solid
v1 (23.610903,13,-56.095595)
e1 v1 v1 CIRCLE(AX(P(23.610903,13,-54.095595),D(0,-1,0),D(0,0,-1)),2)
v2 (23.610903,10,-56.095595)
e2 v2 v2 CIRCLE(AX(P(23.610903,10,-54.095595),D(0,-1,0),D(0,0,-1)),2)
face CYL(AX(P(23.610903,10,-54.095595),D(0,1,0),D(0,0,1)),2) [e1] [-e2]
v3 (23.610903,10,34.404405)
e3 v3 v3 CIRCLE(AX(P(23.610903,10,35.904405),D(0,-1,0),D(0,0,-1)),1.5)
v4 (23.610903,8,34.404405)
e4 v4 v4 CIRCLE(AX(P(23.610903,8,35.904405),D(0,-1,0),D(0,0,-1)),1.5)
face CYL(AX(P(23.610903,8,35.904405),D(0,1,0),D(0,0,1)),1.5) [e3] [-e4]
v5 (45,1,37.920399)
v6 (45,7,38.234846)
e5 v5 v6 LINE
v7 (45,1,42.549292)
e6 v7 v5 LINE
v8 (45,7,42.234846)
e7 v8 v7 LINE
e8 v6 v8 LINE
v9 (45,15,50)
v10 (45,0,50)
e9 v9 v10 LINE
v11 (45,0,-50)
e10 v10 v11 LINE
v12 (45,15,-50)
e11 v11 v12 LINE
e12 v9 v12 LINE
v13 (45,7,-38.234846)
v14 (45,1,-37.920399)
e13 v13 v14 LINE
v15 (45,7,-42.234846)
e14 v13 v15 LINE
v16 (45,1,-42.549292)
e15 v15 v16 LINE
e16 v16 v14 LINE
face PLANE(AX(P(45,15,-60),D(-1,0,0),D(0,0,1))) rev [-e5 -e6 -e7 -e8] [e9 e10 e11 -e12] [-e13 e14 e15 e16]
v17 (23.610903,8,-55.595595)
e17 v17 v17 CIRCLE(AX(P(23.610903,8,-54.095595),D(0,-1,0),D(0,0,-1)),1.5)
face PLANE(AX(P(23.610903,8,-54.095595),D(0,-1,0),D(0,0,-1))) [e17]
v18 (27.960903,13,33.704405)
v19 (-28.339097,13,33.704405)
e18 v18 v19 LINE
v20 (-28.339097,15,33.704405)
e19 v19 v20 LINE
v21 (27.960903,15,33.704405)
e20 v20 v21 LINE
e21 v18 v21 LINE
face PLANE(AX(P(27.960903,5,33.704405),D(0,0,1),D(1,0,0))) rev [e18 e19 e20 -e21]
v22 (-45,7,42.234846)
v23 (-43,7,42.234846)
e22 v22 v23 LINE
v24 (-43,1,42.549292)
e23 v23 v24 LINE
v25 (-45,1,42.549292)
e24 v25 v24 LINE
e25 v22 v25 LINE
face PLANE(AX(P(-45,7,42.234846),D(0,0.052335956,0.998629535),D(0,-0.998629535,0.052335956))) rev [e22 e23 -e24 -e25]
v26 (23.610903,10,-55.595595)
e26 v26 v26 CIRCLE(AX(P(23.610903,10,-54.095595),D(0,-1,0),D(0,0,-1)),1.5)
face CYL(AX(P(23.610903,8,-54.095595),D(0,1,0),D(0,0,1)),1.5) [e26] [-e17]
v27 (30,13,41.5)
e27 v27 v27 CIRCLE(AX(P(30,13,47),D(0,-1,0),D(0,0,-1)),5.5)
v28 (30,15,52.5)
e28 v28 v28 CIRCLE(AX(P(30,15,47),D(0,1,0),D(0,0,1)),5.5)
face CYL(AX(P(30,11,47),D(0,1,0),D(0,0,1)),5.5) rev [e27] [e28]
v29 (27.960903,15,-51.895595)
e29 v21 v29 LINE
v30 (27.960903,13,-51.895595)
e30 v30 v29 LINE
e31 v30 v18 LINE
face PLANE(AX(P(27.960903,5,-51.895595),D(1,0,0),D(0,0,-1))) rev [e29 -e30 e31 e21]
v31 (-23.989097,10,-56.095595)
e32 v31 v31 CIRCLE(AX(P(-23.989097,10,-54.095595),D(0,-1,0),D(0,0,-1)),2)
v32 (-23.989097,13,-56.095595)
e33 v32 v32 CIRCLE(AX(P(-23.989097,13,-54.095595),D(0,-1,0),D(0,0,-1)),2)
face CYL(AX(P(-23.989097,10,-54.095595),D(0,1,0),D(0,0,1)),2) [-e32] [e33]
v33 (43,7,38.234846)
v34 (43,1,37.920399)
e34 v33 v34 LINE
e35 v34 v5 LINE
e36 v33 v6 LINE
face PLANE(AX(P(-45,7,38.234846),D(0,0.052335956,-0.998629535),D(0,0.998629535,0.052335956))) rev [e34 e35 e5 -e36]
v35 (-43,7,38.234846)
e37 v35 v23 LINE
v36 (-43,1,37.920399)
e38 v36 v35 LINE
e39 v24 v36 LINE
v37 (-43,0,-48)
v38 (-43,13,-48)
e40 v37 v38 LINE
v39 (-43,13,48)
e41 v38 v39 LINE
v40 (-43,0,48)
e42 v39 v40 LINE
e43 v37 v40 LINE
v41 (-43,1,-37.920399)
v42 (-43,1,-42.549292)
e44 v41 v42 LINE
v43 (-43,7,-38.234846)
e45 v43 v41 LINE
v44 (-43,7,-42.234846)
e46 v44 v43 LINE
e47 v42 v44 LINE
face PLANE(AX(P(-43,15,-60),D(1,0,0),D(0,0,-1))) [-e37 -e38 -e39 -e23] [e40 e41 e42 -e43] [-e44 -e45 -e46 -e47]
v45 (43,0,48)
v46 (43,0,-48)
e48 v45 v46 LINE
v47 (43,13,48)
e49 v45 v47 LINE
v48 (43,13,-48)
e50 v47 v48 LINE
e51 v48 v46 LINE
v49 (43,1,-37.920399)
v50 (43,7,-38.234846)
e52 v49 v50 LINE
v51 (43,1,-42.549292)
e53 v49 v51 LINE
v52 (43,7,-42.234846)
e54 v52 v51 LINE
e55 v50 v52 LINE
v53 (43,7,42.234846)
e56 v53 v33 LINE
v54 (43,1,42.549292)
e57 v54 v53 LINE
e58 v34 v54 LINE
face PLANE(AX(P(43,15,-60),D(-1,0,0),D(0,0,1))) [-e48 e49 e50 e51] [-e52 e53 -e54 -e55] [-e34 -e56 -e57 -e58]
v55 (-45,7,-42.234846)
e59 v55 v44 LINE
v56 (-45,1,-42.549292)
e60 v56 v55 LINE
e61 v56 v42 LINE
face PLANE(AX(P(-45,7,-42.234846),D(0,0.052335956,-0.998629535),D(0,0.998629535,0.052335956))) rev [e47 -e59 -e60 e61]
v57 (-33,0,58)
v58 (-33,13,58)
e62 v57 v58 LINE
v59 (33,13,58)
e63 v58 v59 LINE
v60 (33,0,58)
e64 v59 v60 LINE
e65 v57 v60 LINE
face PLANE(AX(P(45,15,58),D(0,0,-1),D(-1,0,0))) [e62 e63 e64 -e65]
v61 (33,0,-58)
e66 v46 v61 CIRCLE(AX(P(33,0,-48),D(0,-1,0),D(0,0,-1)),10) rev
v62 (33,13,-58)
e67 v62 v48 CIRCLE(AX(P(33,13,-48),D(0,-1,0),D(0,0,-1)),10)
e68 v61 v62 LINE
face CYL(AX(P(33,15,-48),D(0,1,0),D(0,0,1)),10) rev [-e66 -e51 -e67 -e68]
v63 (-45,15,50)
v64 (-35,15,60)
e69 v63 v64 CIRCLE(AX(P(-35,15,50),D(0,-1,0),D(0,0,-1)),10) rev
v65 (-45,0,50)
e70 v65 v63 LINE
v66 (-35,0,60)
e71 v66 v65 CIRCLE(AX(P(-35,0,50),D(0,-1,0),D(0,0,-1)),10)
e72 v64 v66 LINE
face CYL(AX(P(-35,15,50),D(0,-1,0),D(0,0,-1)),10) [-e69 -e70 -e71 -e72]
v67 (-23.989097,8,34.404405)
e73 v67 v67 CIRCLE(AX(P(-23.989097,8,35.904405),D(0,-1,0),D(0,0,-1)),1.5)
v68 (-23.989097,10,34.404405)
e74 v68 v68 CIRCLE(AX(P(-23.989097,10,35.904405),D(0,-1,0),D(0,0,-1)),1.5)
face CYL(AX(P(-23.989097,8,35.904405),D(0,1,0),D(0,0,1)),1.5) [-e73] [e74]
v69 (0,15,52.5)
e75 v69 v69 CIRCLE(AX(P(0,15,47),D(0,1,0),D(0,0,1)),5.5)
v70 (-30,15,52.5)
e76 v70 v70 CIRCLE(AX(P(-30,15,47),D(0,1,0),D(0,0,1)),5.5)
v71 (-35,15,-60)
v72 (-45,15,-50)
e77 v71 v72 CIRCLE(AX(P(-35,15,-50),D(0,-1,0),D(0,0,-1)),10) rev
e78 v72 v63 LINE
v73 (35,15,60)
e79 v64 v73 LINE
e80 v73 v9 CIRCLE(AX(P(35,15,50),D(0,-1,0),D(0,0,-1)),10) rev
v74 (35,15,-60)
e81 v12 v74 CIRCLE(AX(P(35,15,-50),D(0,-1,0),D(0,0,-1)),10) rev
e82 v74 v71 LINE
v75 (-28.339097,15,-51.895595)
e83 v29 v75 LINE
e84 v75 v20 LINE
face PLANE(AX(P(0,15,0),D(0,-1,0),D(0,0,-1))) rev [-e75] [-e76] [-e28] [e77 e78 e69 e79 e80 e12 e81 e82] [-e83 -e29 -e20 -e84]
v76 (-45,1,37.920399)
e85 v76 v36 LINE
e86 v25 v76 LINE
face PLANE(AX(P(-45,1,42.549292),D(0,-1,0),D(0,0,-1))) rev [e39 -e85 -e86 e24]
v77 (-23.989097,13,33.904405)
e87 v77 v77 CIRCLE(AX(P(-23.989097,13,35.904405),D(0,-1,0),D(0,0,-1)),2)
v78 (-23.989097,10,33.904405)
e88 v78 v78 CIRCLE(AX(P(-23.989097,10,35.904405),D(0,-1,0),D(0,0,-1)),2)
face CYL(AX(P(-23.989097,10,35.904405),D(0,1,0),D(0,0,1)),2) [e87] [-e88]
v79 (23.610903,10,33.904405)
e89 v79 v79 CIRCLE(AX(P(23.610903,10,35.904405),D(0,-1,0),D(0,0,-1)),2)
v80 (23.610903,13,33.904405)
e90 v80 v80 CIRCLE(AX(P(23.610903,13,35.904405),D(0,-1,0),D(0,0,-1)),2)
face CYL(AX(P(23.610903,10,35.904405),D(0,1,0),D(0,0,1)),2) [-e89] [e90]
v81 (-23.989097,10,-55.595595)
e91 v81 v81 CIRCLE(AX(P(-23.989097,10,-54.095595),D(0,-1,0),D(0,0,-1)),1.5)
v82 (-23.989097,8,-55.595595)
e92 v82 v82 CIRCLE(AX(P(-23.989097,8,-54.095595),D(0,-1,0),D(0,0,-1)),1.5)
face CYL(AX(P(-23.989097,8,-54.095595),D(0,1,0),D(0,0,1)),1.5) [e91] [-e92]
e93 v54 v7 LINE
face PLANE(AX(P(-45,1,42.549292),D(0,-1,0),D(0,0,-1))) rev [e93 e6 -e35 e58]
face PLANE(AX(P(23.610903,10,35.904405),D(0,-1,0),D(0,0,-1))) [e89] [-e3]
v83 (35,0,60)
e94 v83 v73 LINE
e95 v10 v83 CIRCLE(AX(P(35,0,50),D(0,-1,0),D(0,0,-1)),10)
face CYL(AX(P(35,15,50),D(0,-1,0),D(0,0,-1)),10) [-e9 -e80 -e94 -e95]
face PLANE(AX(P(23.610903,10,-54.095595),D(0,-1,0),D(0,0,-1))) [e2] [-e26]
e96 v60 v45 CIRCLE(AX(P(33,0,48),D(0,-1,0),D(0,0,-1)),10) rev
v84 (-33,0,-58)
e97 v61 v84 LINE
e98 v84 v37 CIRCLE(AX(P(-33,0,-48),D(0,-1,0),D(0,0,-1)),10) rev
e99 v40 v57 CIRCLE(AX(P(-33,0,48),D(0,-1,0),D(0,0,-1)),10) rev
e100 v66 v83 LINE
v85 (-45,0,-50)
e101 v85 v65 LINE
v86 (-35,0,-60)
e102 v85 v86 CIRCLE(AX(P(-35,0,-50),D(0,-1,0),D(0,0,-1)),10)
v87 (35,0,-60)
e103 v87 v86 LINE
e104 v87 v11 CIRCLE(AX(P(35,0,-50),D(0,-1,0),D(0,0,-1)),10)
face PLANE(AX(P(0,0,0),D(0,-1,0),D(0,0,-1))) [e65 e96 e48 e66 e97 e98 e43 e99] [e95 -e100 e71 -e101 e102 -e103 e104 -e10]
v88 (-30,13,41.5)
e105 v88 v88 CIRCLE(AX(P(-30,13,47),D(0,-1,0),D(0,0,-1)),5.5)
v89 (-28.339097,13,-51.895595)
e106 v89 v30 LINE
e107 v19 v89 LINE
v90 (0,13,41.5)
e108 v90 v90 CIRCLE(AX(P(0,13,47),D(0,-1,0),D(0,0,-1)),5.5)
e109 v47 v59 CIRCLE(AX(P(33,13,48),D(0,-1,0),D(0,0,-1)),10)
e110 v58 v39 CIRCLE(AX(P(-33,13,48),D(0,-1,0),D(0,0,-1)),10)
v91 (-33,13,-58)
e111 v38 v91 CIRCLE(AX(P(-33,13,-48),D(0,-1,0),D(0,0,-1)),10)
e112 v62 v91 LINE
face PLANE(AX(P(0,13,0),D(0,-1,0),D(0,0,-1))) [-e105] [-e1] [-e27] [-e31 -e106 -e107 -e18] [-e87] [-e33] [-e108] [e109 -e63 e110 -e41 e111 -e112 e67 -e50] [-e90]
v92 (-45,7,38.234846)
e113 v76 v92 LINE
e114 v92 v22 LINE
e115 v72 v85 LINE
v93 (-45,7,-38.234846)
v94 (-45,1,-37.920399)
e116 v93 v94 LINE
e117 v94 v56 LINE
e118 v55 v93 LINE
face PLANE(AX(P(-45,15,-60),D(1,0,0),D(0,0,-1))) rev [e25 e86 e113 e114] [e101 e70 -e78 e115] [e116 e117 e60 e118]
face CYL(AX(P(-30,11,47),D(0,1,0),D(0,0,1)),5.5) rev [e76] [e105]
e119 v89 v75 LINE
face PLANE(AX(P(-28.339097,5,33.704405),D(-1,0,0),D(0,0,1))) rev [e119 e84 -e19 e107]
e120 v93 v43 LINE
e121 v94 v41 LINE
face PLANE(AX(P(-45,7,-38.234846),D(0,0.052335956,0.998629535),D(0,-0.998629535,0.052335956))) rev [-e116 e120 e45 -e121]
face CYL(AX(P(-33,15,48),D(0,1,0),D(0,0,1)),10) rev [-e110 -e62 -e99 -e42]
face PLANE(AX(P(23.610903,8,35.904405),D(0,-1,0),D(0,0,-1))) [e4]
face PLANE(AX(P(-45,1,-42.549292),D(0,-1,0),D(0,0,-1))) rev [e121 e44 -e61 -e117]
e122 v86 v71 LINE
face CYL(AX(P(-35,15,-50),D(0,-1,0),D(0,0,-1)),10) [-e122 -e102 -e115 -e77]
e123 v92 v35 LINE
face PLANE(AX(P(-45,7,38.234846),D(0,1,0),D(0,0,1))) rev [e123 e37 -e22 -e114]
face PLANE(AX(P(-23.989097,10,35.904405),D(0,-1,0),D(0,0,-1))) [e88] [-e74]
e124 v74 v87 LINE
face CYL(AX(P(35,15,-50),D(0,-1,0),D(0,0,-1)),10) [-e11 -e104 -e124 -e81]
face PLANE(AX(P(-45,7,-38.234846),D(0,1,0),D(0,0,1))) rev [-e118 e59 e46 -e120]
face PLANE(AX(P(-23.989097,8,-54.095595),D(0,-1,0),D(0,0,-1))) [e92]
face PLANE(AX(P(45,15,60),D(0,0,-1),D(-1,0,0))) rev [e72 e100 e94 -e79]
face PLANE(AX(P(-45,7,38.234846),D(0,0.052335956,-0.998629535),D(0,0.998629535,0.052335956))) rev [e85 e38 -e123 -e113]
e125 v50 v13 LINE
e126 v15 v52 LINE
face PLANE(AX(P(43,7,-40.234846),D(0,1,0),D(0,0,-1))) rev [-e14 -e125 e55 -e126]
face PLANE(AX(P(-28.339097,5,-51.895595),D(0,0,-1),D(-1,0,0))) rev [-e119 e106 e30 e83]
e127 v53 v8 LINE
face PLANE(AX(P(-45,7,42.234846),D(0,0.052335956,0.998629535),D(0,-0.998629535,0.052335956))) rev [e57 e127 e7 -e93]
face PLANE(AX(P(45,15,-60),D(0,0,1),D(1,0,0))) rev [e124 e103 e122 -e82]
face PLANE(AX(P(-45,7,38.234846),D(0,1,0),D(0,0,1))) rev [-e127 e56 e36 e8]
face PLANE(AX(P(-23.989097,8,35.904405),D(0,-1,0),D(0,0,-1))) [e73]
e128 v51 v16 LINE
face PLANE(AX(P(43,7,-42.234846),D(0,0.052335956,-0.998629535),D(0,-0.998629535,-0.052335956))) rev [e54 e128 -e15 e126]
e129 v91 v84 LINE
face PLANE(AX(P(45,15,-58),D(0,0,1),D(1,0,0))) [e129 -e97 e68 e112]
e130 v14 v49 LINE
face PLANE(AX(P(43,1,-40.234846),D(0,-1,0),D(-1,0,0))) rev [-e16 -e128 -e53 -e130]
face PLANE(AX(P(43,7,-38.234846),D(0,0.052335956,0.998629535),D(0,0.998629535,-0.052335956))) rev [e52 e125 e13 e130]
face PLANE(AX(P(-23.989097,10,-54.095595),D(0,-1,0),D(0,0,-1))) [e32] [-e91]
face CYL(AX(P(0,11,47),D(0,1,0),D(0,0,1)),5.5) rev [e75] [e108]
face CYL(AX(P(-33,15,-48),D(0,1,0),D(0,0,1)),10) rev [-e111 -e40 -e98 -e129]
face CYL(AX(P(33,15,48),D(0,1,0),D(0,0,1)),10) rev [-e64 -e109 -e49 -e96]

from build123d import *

# Parameters (mm, degrees)
CROQUIS1_W               = 90
CROQUIS1_H               = 120
SALIENTE_EXTRUIR1_DEPTH  = 15
VACIADO1_T               = -2
CROQUIS3_W               = 56.3
CROQUIS3_H               = 85.6
CORTAR_EXTRUIR1_DEPTH    = 10
CROQUIS4_R               = 2
SALIENTE_EXTRUIR2_DEPTH  = 3
CROQUIS5_R               = 1.5
SALIENTE_EXTRUIR3_DEPTH  = 2
CROQUIS6_R               = 5.5
CORTAR_EXTRUIR2_DEPTH    = 4
REDONDEO1_R              = 10
RANURA_START             = 43
RANURA_DE_RESORTE1_DEPTH = 2
CORTAR_EXTRUIR3_DEPTH    = 110.201648339


# Read off the part's stored shape, not the designer's step: Ranura de resorte1
with BuildPart() as part:
    # Croquis1 → Saliente-Extruir1 (new body)
    with BuildSketch(Plane(origin=(0, 0, 0), x_dir=(1, 0, 0), z_dir=(0, 1, 0))):
        Rectangle(CROQUIS1_W, CROQUIS1_H)
    extrude(amount=SALIENTE_EXTRUIR1_DEPTH)

    # Vaciado1
    vaciado1_openings = [part.faces().sort_by_distance(p)[0] for p in [
        (0, 0, 0),
    ]]
    offset(amount=VACIADO1_T, openings=vaciado1_openings, kind=Kind.INTERSECTION)

    # Croquis3 → Cortar-Extruir1 (cut)
    with BuildSketch(Plane(origin=(0, 15, 0), x_dir=(1, 0, 0), z_dir=(0, 1, 0))):
        with Locations((-0.189097346, 9.095595484)):
            Rectangle(CROQUIS3_W, CROQUIS3_H)
    extrude(amount=-CORTAR_EXTRUIR1_DEPTH, mode=Mode.SUBTRACT)

    # Croquis4 → Saliente-Extruir2 (add)
    with BuildSketch(Plane.XZ.offset(-13)):
        with Locations(Location((-23.989097346, 35.904404516, 0), (0, 0, 270))):
            Circle(CROQUIS4_R)
        with Locations(Location((23.610902654, 35.904404516, 0), (0, 0, 270))):
            Circle(CROQUIS4_R)
        with Locations(Location((-23.989097346, -54.095595484, 0), (0, 0, 270))):
            Circle(CROQUIS4_R)
        with Locations(Location((23.610902654, -54.095595484, 0), (0, 0, 270))):
            Circle(CROQUIS4_R)
    extrude(amount=SALIENTE_EXTRUIR2_DEPTH)

    # Croquis5 → Saliente-Extruir3 (add)
    with BuildSketch(Plane.XZ.offset(-10)):
        with Locations(Location((-23.989097346, -54.095595484, 0), (0, 0, 270))):
            Circle(CROQUIS5_R)
        with Locations(Location((23.610902654, -54.095595484, 0), (0, 0, 270))):
            Circle(CROQUIS5_R)
        with Locations(Location((23.610902654, 35.904404516, 0), (0, 0, 270))):
            Circle(CROQUIS5_R)
        with Locations(Location((-23.989097346, 35.904404516, 0), (0, 0, 270))):
            Circle(CROQUIS5_R)
    extrude(amount=SALIENTE_EXTRUIR3_DEPTH)

    # Croquis6 → Cortar-Extruir2 (cut)
    with BuildSketch(Plane(origin=(0, 15, 0), x_dir=(1, 0, 0), z_dir=(0, 1, 0))):
        with Locations(Location((-30, -47, 0), (0, 0, 270))):
            Circle(CROQUIS6_R)
        with Locations(Location((0, -47, 0), (0, 0, 270))):
            Circle(CROQUIS6_R)
        with Locations(Location((30, -47, 0), (0, 0, 270))):
            Circle(CROQUIS6_R)
    extrude(amount=-CORTAR_EXTRUIR2_DEPTH, mode=Mode.SUBTRACT)

    # Redondeo1
    redondeo1_edges = [part.edges().sort_by_distance(p)[0] for p in [
        (-43, 6.5, -58),
        (-43, 6.5, 58),
        (43, 6.5, 58),
        (43, 6.5, -58),
        (-45, 7.5, -60),
        (45, 7.5, -60),
        (45, 7.5, 60),
        (-45, 7.5, 60),
    ]]
    fillet(redondeo1_edges, radius=REDONDEO1_R)

    # Ranura de resorte1 outline → Ranura de resorte1 (cut)
    with BuildSketch(Plane.YZ.offset(RANURA_START)):
        Polygon((7, -38.234845775), (1, -37.9203991), (1, -42.549292451), (7, -42.234845775), align=None)
    extrude(amount=RANURA_DE_RESORTE1_DEPTH, mode=Mode.SUBTRACT)

    # Croquis7 → Cortar-Extruir3 (cut, through all)
    with BuildSketch(Plane(origin=(45, 0, 0), x_dir=(0, 0, -1), z_dir=(1, 0, 0))):
        Polygon((42.549292451, 1), (37.9203991, 1), (38.234845775, 7), (42.234845775, 7), align=None)
        Polygon((-42.234845775, 7), (-42.549292451, 1), (-37.9203991, 1), (-38.234845775, 7), align=None)
    extrude(amount=-CORTAR_EXTRUIR3_DEPTH, mode=Mode.SUBTRACT)


solid = part.part
